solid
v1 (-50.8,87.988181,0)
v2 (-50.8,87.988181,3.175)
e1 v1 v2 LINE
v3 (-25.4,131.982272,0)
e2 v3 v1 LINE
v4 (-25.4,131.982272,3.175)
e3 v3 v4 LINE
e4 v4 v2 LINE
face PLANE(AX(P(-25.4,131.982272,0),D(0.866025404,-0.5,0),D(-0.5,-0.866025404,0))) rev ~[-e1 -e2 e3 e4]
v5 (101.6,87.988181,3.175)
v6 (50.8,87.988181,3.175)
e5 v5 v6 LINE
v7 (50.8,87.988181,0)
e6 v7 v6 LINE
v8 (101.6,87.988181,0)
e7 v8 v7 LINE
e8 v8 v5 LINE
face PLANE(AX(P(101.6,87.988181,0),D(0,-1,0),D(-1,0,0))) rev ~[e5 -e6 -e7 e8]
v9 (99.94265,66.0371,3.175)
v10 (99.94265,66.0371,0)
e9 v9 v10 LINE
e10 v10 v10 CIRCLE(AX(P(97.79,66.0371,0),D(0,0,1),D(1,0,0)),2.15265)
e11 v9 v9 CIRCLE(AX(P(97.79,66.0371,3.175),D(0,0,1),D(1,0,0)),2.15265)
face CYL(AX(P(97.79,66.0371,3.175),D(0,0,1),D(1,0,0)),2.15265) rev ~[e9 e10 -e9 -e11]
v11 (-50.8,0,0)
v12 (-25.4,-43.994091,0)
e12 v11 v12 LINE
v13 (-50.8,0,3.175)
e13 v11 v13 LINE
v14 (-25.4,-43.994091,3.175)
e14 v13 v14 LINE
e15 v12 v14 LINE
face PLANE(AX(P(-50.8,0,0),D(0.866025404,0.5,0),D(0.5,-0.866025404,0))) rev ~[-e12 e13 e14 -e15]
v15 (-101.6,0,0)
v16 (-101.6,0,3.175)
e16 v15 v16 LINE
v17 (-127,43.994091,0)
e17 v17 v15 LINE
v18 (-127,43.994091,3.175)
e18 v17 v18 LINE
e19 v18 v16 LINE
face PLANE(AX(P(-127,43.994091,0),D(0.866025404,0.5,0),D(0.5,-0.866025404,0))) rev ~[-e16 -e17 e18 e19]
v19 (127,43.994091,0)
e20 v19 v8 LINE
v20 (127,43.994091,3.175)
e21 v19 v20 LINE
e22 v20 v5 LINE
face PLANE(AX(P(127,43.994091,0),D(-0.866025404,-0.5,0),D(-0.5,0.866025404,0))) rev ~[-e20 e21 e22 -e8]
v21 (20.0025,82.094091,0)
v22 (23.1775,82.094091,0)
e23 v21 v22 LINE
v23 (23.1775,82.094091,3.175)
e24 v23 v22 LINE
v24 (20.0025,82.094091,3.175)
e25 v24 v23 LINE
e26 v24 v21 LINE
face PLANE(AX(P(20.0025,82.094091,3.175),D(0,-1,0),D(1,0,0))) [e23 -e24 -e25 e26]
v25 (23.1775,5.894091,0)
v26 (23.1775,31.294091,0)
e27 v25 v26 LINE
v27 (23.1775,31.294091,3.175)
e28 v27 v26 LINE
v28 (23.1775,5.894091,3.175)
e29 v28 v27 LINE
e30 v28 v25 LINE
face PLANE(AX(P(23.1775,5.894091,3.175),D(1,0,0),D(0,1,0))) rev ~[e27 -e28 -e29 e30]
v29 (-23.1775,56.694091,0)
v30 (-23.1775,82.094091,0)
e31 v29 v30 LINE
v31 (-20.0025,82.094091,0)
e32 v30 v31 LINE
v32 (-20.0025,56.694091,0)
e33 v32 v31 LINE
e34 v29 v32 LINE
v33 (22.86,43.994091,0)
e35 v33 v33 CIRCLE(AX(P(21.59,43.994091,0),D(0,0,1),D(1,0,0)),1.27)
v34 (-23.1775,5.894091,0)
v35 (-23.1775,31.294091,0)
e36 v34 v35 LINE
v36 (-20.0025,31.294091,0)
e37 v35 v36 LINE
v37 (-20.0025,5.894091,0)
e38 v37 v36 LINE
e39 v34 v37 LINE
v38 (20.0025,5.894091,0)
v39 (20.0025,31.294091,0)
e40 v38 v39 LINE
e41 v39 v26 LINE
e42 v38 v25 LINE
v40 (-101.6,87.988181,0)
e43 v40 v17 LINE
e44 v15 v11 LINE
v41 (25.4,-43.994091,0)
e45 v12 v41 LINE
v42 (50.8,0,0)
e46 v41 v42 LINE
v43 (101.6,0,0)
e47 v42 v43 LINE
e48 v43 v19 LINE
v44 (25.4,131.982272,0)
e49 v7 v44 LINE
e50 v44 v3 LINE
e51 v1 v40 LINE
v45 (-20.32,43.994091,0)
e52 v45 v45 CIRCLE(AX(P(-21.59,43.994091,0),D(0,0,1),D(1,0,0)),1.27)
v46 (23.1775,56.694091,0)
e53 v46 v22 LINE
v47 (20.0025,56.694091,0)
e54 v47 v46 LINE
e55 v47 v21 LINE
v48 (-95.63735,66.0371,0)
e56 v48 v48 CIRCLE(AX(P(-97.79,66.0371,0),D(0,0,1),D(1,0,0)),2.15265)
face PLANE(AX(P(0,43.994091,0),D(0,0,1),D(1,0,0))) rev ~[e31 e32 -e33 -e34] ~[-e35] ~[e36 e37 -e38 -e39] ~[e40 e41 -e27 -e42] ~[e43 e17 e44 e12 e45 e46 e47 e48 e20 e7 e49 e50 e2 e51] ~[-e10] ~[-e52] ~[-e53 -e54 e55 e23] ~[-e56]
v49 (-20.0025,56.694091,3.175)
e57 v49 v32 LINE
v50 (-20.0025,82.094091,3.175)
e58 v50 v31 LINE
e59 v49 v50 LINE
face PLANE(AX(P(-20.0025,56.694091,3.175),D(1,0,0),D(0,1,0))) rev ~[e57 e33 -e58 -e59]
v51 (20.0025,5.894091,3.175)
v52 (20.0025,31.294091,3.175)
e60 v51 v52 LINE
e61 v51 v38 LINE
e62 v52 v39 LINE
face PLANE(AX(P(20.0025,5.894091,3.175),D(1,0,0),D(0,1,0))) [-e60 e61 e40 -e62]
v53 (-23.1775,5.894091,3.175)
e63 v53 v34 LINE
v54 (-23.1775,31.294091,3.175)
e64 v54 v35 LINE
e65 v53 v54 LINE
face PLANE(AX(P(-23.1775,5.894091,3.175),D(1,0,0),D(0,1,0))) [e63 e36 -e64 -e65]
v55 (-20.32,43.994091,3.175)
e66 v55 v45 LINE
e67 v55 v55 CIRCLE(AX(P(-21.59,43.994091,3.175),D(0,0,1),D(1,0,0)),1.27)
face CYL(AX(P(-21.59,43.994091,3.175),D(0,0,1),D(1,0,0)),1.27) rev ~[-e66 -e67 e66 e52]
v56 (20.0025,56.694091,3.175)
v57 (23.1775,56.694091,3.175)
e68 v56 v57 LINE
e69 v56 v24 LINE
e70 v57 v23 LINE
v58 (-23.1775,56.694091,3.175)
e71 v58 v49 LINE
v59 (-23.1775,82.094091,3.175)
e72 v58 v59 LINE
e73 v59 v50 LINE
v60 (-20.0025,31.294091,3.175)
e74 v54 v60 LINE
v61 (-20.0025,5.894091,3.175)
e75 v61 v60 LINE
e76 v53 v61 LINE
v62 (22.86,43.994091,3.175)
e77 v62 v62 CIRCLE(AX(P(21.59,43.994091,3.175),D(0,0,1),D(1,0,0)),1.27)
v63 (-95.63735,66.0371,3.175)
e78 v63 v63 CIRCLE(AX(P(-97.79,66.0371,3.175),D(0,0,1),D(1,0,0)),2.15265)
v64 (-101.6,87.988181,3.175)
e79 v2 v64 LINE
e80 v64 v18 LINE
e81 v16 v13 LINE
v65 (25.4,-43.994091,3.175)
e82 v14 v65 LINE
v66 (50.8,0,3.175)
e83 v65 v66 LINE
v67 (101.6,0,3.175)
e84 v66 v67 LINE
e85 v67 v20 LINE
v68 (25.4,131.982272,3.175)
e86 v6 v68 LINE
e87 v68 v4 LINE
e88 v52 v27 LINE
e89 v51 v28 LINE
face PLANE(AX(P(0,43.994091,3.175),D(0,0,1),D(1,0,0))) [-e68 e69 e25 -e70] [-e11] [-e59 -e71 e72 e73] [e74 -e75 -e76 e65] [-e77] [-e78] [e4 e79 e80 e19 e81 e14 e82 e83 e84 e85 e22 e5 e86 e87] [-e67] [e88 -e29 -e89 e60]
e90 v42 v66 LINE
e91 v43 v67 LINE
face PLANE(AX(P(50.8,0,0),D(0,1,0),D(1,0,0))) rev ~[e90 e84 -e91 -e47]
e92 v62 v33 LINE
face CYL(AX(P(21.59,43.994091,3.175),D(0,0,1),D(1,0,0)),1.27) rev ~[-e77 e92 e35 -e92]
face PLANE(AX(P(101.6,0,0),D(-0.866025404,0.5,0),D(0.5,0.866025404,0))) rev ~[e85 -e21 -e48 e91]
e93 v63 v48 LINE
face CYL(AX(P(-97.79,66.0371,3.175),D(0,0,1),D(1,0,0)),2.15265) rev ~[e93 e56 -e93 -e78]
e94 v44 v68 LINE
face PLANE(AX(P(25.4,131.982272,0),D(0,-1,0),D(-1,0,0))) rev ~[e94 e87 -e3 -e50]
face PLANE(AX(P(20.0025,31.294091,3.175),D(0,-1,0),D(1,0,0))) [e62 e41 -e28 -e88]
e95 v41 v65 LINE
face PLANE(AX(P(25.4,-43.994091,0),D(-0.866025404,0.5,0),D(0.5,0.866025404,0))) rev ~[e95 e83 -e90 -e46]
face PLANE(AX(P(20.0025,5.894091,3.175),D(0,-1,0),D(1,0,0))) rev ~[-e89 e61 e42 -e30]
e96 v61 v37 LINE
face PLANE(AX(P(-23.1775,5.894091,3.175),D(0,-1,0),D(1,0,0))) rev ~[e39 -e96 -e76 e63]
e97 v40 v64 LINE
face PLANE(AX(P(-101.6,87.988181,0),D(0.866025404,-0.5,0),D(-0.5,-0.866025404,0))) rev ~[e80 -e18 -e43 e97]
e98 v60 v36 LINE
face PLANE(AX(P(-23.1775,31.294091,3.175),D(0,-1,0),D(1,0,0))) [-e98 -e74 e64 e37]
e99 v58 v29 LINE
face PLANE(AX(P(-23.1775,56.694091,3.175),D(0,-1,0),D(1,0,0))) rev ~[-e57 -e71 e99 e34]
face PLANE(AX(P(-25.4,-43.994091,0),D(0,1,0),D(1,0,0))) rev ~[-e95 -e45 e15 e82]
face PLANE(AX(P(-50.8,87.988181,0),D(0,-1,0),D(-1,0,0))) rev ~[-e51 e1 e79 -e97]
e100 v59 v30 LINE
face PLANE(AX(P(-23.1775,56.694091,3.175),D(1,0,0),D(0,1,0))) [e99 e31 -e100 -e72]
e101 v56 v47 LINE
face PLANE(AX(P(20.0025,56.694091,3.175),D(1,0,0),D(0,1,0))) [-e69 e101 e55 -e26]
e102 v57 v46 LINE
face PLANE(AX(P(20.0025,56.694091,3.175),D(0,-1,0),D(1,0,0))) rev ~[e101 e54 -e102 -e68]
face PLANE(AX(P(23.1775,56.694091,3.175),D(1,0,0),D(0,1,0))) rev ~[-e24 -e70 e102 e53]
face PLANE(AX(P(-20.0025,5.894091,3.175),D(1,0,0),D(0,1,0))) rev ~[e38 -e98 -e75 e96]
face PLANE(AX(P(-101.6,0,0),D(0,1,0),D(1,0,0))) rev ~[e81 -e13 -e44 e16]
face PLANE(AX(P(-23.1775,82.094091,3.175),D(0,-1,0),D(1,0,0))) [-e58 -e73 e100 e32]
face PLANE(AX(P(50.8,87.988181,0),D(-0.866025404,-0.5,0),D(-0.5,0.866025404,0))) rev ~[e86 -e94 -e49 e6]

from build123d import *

# Parameters (mm, degrees)
F1_DEPTH = 3.175
F2_W     = 3.175
F2_H     = 25.4
F3_DEPTH = 7.62
F2_R     = 1.27
F4_DEPTH = 7.62
F5_R     = 2.15265
F6_DEPTH = 25.4


# Not quite as in the source:
# - a length typed as a fraction of an inch, garbled in the dataset ("3 / 203.2 mm" for 3/8 in), is restored


with BuildPart() as f1:
    # F0 (on Top) → F1 (new body)
    with BuildSketch(Plane.XY):
        Polygon((-25.4, -43.9940905122), (25.4, -43.9940905122), (50.8, 0), (101.6, 0), (127, 43.9940905122), (101.6, 87.9881810245), (50.8, 87.9881810245), (25.4, 131.9822715367), (-25.4, 131.9822715367), (-50.8, 87.9881810245), (-101.6, 87.9881810245), (-127, 43.9940905122), (-101.6, 0), (-50.8, 0), align=None)
    extrude(amount=F1_DEPTH)

    # F2 (on face) → F3 (cut)
    with BuildSketch(Plane.XY.offset(3.175)):
        with Locations((-21.59, 69.3940905122)):
            Rectangle(F2_W, F2_H)
        with Locations((21.59, 69.3940905122)):
            Rectangle(F2_W, F2_H)
        with Locations((21.59, 18.5940905122)):
            Rectangle(F2_W, F2_H)
        with Locations((-21.59, 18.5940905122)):
            Rectangle(F2_W, F2_H)
    extrude(amount=-F3_DEPTH, mode=Mode.SUBTRACT)

    # F2 (on face) → F4 (cut)
    with BuildSketch(Plane.XY.offset(3.175)):
        with Locations((-21.59, 43.9940905122)):
            Circle(F2_R)
        with Locations((21.59, 43.9940905122)):
            Circle(F2_R)
    extrude(amount=-F4_DEPTH, mode=Mode.SUBTRACT)

    # F5 (on face) → F6 (cut)
    with BuildSketch(Plane.XY.offset(3.175)):
        with Locations((97.79, 66.0370998967)):
            Circle(F5_R)
        with Locations((-97.79, 66.0370998967)):
            Circle(F5_R)
    extrude(amount=-F6_DEPTH, mode=Mode.SUBTRACT)


solid = f1.part
